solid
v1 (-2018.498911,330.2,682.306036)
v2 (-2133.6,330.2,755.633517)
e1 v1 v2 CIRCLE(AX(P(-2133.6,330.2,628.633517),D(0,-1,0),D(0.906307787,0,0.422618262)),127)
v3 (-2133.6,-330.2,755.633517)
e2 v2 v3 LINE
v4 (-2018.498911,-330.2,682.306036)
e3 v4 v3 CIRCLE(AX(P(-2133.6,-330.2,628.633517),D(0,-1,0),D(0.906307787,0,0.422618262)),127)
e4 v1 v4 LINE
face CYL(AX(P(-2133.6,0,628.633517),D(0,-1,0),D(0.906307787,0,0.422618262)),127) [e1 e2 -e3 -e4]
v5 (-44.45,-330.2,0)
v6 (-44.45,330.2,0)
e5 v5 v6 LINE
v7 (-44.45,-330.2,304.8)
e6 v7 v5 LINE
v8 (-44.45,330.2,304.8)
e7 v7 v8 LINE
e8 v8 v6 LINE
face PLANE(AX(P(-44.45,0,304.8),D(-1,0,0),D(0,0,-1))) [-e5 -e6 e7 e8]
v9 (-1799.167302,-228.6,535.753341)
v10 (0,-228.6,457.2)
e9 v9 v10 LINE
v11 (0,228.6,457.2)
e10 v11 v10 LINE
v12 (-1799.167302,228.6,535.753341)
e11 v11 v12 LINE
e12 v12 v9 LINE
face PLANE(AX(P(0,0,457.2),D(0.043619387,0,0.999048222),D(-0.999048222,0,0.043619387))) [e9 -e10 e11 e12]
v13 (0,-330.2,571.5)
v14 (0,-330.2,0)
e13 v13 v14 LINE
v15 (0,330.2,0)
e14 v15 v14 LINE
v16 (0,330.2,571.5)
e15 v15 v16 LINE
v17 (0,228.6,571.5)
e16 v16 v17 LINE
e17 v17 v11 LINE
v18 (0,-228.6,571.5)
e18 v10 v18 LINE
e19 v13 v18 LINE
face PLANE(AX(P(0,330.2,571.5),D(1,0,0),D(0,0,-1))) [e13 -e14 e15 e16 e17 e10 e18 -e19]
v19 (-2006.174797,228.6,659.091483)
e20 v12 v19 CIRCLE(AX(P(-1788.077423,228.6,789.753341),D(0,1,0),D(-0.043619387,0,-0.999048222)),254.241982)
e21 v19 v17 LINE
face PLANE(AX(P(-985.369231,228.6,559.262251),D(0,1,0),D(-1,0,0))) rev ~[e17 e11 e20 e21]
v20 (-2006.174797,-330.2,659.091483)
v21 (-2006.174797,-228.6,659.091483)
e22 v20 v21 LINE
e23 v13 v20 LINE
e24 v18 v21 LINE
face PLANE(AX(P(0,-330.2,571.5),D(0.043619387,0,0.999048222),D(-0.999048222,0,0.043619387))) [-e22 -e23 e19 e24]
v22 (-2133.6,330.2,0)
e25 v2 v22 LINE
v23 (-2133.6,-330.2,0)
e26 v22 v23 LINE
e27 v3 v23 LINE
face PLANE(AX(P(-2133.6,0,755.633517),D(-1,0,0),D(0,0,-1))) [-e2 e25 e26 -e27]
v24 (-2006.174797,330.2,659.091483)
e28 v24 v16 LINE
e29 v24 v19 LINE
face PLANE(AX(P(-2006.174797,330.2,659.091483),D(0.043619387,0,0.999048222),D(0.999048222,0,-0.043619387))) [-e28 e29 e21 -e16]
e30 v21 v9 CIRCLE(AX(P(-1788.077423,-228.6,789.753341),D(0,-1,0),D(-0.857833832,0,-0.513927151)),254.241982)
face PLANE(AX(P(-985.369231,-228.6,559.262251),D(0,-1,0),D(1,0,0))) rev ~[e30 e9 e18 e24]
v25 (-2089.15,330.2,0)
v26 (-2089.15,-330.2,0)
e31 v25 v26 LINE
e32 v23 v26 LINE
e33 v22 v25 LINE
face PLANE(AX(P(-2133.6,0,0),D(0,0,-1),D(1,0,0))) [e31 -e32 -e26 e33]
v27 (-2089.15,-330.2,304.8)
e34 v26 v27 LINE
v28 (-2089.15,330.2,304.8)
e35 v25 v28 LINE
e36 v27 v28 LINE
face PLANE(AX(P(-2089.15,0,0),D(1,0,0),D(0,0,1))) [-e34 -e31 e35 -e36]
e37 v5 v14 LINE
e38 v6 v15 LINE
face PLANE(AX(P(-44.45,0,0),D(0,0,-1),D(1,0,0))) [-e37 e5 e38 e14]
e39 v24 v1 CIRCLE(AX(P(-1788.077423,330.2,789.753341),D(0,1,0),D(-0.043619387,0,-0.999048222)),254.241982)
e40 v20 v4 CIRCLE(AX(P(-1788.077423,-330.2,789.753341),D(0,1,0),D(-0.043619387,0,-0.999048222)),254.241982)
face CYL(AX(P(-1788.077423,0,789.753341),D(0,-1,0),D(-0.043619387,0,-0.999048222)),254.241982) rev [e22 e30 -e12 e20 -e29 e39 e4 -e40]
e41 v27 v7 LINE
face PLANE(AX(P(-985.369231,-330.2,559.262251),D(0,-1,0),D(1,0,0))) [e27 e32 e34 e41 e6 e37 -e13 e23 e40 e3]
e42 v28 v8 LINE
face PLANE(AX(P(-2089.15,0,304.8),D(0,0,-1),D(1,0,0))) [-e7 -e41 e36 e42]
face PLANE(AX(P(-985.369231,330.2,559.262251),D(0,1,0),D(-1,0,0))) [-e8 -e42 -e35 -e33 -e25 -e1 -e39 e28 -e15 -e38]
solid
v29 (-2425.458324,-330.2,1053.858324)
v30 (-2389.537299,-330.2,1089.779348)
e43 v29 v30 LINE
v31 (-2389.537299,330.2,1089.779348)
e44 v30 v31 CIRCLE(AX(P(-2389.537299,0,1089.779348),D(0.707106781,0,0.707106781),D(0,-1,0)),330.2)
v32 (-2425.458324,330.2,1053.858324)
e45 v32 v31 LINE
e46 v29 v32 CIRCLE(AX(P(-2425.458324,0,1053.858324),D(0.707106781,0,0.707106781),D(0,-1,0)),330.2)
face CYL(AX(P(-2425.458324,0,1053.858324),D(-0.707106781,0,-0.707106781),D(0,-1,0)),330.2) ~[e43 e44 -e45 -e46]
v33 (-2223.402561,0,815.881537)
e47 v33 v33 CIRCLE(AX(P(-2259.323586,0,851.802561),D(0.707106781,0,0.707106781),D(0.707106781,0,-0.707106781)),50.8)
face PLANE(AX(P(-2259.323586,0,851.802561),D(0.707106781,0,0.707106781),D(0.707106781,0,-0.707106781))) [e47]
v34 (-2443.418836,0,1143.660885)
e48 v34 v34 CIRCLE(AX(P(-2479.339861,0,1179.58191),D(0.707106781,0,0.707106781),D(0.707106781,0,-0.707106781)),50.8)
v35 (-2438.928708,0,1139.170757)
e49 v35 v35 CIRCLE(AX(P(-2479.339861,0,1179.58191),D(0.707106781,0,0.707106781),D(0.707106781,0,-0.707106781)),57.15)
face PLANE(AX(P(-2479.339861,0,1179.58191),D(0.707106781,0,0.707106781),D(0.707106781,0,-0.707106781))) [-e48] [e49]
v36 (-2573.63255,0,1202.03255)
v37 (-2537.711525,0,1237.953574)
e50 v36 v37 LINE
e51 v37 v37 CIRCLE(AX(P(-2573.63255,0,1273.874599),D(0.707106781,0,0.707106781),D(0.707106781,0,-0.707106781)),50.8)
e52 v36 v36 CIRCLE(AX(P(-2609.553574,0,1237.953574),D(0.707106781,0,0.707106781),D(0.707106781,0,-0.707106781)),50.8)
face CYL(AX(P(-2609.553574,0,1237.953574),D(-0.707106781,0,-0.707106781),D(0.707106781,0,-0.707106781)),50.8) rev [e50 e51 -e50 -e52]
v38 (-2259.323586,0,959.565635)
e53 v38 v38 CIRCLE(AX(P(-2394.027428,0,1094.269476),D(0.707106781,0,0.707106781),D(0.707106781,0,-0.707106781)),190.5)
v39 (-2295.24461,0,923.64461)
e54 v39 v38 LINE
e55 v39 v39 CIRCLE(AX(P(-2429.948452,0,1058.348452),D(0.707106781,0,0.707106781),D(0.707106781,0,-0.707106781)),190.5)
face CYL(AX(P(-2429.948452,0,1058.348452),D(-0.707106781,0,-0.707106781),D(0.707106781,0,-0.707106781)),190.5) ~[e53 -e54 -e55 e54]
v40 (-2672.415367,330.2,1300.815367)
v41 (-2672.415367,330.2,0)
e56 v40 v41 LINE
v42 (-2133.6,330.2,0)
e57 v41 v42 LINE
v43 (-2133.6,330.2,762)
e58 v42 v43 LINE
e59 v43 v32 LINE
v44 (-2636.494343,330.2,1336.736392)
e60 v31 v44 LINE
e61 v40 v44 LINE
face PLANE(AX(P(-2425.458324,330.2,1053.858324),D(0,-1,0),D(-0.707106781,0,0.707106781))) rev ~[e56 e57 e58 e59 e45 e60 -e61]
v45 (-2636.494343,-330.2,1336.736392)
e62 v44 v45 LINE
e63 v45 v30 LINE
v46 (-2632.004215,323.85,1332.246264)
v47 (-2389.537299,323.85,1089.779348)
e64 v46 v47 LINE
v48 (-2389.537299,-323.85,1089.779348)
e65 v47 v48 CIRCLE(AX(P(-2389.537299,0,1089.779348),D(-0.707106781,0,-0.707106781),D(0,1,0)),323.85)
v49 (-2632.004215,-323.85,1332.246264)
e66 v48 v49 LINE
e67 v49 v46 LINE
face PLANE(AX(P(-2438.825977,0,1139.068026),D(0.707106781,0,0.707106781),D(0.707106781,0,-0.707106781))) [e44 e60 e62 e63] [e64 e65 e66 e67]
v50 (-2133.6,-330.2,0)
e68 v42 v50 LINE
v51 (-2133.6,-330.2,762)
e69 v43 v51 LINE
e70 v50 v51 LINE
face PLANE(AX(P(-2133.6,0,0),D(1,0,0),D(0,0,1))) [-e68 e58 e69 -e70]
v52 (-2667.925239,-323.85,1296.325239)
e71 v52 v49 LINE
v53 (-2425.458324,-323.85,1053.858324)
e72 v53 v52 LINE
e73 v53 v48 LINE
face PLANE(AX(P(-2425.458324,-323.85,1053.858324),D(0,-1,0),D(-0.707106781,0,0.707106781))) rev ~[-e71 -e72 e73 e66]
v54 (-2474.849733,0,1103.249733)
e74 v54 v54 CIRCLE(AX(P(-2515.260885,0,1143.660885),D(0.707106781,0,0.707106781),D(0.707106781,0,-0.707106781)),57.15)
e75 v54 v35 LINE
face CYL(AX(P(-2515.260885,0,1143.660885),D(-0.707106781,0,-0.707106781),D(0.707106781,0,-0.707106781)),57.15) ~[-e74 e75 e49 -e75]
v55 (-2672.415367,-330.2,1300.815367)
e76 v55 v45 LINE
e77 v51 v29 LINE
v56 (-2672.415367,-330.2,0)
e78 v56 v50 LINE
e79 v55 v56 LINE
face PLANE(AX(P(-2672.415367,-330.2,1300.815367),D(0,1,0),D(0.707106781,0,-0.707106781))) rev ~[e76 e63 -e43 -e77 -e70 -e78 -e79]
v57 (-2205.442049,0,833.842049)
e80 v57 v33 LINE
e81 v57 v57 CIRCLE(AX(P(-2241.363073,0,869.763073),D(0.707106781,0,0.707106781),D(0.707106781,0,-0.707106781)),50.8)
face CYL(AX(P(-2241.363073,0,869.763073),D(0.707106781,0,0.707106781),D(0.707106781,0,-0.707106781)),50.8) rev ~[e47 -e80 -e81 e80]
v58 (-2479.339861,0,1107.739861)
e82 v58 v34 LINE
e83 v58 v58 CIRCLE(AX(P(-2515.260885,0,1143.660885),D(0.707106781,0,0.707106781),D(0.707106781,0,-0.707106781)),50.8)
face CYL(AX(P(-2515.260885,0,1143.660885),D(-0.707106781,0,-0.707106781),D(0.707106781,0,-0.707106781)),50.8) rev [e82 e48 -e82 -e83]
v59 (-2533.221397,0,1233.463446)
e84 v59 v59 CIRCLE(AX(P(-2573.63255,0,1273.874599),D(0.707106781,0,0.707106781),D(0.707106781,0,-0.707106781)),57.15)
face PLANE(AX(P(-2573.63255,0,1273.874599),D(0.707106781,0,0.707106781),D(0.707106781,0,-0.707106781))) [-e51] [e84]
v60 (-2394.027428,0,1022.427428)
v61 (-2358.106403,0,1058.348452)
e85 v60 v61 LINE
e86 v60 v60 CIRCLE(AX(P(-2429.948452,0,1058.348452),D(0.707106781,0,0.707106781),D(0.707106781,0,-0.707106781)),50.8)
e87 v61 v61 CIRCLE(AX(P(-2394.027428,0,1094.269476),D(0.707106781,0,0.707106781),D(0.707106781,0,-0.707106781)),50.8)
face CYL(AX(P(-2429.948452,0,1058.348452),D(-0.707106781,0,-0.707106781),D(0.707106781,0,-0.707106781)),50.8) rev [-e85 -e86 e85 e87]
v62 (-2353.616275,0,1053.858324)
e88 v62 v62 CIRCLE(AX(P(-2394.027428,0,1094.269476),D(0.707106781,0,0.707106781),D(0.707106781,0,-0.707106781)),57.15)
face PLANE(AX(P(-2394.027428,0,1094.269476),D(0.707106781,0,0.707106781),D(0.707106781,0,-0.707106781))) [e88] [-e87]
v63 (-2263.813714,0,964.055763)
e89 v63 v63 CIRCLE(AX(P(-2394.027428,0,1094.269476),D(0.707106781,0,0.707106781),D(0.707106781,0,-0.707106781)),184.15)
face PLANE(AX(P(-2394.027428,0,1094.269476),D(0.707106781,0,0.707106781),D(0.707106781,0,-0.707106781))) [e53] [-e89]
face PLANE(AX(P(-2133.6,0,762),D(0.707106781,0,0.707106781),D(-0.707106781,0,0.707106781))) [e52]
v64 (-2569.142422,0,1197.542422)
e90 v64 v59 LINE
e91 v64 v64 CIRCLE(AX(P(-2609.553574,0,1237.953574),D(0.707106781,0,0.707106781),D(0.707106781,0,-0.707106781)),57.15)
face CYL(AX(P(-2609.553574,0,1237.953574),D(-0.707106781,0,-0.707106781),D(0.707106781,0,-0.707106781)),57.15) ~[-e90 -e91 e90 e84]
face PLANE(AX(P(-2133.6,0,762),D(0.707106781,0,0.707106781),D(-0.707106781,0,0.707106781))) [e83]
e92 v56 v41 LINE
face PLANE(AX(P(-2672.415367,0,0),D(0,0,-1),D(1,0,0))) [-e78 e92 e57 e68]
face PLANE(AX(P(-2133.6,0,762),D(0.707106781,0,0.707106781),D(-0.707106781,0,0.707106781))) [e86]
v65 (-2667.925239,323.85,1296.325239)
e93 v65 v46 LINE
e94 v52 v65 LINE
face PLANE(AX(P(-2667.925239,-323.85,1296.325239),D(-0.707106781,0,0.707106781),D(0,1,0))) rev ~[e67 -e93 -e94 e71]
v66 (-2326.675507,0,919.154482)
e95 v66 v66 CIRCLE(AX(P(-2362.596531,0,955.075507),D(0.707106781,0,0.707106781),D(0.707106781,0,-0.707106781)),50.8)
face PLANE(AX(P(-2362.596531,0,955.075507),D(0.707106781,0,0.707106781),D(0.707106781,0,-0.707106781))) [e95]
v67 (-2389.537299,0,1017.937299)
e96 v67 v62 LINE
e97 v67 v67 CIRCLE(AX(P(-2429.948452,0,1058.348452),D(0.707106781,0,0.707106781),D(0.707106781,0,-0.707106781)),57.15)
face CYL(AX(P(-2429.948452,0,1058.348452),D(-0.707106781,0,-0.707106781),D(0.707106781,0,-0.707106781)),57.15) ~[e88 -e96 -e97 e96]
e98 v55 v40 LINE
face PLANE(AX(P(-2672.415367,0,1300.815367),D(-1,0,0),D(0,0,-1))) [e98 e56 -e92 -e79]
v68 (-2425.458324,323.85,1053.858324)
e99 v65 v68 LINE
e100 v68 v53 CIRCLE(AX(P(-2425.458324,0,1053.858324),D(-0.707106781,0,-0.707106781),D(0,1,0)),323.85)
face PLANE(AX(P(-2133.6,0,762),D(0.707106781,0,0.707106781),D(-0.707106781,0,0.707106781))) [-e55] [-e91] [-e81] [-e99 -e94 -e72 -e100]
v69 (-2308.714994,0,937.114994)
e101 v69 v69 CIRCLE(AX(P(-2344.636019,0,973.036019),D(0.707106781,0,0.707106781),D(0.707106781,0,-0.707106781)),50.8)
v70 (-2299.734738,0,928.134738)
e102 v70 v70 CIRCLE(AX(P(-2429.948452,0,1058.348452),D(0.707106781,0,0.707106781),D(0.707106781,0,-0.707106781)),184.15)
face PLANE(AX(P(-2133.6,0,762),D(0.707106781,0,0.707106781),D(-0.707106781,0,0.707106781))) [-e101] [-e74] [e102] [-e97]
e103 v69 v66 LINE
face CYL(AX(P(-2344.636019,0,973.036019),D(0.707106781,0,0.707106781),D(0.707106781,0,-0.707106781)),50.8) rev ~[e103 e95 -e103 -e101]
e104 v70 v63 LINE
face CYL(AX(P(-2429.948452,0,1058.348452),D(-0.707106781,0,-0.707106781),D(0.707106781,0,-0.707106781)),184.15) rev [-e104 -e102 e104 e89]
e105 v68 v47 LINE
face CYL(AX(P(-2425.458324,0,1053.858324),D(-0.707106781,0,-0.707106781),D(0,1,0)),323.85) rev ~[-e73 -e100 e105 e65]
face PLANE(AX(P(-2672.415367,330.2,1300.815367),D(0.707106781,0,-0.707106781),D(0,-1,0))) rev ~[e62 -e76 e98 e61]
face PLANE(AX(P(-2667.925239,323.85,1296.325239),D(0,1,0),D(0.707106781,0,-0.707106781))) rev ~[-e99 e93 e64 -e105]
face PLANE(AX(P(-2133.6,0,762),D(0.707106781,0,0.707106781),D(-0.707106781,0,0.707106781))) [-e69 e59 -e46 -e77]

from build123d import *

# Parameters (mm, degrees)
F2_DEPTH  = 330.2
F4_DEPTH  = 330.2
F5_R      = 190.5
F5_R_2    = 184.15
F5_R_3    = 57.15
F5_R_4    = 50.8
F6_DEPTH  = 50.8
F7_DEPTH  = 25.4
F9_DEPTH  = 101.6
F11_DEPTH = 101.6


# Not quite as in the source:
# - a variable given as a bare number and used for a length is read in inches; the dataset says mm whatever the document's units were


with BuildPart() as f2:
    # F1 (on Front) → F2 (new body, symmetric)
    with BuildSketch(Plane.XZ):
        with BuildLine():
            Line((-44.45, 0), (0, 0))
            Line((0, 0), (0, 457.2))
            Line((0, 457.2), (-1799.1673024383, 535.7533408746))
            ThreePointArc((-1799.1673024383, 535.7533408746), (-1929.3267001402, 578.3588586439), (-2018.4989110463, 682.306036367))
            ThreePointArc((-2018.4989110463, 682.306036367), (-2065.36294974, 735.7442307441), (-2133.6, 755.6335171259))
            Line((-2133.6, 755.6335171259), (-2133.6, 0))
            Line((-2133.6, 0), (-2089.15, 0))
            Line((-2089.15, 0), (-2089.15, 304.8))
            Line((-2089.15, 304.8), (-44.45, 304.8))
            Line((-44.45, 304.8), (-44.45, 0))
        make_face()
    extrude(amount=F2_DEPTH, both=True)

    # F8 (on face) → F9 (join)
    with BuildSketch(Plane.XZ.offset(330.2)):
        with BuildLine():
            Line((-1799.1673024383, 535.7533408746), (0, 457.2))
            Line((0, 457.2), (0, 571.5))
            Line((0, 571.5), (-2006.1747965862, 659.0914832582))
            ThreePointArc((-2006.1747965862, 659.0914832582), (-1918.2110987992, 571.3404020762), (-1799.1673024383, 535.7533408746))
        make_face()
    extrude(amount=-F9_DEPTH)

    # F10 (on face) → F11 (join)
    with BuildSketch(Plane(origin=(0, 330.2, 0), x_dir=(-1, 0, 0), z_dir=(0, 1, 0))):
        with BuildLine():
            Line((2006.1747965862, 659.0914832582), (0, 571.5))
            Line((0, 571.5), (0, 457.2))
            Line((0, 457.2), (1799.1673024383, 535.7533408746))
            ThreePointArc((1799.1673024383, 535.7533408746), (1918.2110987992, 571.3404020762), (2006.1747965862, 659.0914832582))
        make_face()
    extrude(amount=-F11_DEPTH)


with BuildPart() as f4:
    # F3 (on Front) → F4 (new body, symmetric)
    with BuildSketch(Plane.XZ):
        Polygon((-2672.4153672641, 0), (-2133.6, 0), (-2133.6, 762), (-2672.4153672641, 1300.8153672641), align=None)
    extrude(amount=F4_DEPTH, both=True)

    # F5 (on face) → F6 (join)
    with BuildSketch(Plane(origin=(-685.8, 0, -685.8), x_dir=(0.7071067812, 0, -0.7071067812), z_dir=(0.7071067812, 0, 0.7071067812))):
        with BuildLine():
            Line((-2809.4983956038, -330.2), (-2460.2483956038, -330.2))
            ThreePointArc((-2460.2483956038, -330.2), (-2130.0483956038, 0), (-2460.2483956038, 330.2))
            Line((-2460.2483956038, 330.2), (-2809.4983956038, 330.2))
            Line((-2809.4983956038, 330.2), (-2809.4983956038, -330.2))
        make_face()
        with BuildLine():
            ThreePointArc((-2460.2483956038, 323.85), (-2136.3983956038, 0), (-2460.2483956038, -323.85))
            Line((-2460.2483956038, -323.85), (-2803.1483956038, -323.85))
            Line((-2803.1483956038, -323.85), (-2803.1483956038, 323.85))
            Line((-2803.1483956038, 323.85), (-2460.2483956038, 323.85))
        make_face(mode=Mode.SUBTRACT)
        with Locations((-2466.5983956038, 0)):
            Circle(F5_R)
        with Locations((-2466.5983956038, 0)):
            Circle(F5_R_2, mode=Mode.SUBTRACT)
        with Locations((-2466.5983956038, 0)):
            Circle(F5_R_3)
        with Locations((-2466.5983956038, 0)):
            Circle(F5_R_4, mode=Mode.SUBTRACT)
        with Locations((-2587.2483956038, 0)):
            Circle(F5_R_3)
        with Locations((-2587.2483956038, 0)):
            Circle(F5_R_4, mode=Mode.SUBTRACT)
        with Locations((-2720.5983956038, 0)):
            Circle(F5_R_3)
        with Locations((-2720.5983956038, 0)):
            Circle(F5_R_4, mode=Mode.SUBTRACT)
    extrude(amount=F6_DEPTH)

    # F5 (on face) → F7 (cut)
    with BuildSketch(Plane(origin=(-685.8, 0, -685.8), x_dir=(0.7071067812, 0, -0.7071067812), z_dir=(0.7071067812, 0, 0.7071067812))):
        with Locations((-2199.8983956038, 0)):
            Circle(F5_R_4)
        with Locations((-2345.9483956038, 0)):
            Circle(F5_R_4)
    extrude(amount=-F7_DEPTH, mode=Mode.SUBTRACT)


solid = Compound([f2.part, f4.part])
